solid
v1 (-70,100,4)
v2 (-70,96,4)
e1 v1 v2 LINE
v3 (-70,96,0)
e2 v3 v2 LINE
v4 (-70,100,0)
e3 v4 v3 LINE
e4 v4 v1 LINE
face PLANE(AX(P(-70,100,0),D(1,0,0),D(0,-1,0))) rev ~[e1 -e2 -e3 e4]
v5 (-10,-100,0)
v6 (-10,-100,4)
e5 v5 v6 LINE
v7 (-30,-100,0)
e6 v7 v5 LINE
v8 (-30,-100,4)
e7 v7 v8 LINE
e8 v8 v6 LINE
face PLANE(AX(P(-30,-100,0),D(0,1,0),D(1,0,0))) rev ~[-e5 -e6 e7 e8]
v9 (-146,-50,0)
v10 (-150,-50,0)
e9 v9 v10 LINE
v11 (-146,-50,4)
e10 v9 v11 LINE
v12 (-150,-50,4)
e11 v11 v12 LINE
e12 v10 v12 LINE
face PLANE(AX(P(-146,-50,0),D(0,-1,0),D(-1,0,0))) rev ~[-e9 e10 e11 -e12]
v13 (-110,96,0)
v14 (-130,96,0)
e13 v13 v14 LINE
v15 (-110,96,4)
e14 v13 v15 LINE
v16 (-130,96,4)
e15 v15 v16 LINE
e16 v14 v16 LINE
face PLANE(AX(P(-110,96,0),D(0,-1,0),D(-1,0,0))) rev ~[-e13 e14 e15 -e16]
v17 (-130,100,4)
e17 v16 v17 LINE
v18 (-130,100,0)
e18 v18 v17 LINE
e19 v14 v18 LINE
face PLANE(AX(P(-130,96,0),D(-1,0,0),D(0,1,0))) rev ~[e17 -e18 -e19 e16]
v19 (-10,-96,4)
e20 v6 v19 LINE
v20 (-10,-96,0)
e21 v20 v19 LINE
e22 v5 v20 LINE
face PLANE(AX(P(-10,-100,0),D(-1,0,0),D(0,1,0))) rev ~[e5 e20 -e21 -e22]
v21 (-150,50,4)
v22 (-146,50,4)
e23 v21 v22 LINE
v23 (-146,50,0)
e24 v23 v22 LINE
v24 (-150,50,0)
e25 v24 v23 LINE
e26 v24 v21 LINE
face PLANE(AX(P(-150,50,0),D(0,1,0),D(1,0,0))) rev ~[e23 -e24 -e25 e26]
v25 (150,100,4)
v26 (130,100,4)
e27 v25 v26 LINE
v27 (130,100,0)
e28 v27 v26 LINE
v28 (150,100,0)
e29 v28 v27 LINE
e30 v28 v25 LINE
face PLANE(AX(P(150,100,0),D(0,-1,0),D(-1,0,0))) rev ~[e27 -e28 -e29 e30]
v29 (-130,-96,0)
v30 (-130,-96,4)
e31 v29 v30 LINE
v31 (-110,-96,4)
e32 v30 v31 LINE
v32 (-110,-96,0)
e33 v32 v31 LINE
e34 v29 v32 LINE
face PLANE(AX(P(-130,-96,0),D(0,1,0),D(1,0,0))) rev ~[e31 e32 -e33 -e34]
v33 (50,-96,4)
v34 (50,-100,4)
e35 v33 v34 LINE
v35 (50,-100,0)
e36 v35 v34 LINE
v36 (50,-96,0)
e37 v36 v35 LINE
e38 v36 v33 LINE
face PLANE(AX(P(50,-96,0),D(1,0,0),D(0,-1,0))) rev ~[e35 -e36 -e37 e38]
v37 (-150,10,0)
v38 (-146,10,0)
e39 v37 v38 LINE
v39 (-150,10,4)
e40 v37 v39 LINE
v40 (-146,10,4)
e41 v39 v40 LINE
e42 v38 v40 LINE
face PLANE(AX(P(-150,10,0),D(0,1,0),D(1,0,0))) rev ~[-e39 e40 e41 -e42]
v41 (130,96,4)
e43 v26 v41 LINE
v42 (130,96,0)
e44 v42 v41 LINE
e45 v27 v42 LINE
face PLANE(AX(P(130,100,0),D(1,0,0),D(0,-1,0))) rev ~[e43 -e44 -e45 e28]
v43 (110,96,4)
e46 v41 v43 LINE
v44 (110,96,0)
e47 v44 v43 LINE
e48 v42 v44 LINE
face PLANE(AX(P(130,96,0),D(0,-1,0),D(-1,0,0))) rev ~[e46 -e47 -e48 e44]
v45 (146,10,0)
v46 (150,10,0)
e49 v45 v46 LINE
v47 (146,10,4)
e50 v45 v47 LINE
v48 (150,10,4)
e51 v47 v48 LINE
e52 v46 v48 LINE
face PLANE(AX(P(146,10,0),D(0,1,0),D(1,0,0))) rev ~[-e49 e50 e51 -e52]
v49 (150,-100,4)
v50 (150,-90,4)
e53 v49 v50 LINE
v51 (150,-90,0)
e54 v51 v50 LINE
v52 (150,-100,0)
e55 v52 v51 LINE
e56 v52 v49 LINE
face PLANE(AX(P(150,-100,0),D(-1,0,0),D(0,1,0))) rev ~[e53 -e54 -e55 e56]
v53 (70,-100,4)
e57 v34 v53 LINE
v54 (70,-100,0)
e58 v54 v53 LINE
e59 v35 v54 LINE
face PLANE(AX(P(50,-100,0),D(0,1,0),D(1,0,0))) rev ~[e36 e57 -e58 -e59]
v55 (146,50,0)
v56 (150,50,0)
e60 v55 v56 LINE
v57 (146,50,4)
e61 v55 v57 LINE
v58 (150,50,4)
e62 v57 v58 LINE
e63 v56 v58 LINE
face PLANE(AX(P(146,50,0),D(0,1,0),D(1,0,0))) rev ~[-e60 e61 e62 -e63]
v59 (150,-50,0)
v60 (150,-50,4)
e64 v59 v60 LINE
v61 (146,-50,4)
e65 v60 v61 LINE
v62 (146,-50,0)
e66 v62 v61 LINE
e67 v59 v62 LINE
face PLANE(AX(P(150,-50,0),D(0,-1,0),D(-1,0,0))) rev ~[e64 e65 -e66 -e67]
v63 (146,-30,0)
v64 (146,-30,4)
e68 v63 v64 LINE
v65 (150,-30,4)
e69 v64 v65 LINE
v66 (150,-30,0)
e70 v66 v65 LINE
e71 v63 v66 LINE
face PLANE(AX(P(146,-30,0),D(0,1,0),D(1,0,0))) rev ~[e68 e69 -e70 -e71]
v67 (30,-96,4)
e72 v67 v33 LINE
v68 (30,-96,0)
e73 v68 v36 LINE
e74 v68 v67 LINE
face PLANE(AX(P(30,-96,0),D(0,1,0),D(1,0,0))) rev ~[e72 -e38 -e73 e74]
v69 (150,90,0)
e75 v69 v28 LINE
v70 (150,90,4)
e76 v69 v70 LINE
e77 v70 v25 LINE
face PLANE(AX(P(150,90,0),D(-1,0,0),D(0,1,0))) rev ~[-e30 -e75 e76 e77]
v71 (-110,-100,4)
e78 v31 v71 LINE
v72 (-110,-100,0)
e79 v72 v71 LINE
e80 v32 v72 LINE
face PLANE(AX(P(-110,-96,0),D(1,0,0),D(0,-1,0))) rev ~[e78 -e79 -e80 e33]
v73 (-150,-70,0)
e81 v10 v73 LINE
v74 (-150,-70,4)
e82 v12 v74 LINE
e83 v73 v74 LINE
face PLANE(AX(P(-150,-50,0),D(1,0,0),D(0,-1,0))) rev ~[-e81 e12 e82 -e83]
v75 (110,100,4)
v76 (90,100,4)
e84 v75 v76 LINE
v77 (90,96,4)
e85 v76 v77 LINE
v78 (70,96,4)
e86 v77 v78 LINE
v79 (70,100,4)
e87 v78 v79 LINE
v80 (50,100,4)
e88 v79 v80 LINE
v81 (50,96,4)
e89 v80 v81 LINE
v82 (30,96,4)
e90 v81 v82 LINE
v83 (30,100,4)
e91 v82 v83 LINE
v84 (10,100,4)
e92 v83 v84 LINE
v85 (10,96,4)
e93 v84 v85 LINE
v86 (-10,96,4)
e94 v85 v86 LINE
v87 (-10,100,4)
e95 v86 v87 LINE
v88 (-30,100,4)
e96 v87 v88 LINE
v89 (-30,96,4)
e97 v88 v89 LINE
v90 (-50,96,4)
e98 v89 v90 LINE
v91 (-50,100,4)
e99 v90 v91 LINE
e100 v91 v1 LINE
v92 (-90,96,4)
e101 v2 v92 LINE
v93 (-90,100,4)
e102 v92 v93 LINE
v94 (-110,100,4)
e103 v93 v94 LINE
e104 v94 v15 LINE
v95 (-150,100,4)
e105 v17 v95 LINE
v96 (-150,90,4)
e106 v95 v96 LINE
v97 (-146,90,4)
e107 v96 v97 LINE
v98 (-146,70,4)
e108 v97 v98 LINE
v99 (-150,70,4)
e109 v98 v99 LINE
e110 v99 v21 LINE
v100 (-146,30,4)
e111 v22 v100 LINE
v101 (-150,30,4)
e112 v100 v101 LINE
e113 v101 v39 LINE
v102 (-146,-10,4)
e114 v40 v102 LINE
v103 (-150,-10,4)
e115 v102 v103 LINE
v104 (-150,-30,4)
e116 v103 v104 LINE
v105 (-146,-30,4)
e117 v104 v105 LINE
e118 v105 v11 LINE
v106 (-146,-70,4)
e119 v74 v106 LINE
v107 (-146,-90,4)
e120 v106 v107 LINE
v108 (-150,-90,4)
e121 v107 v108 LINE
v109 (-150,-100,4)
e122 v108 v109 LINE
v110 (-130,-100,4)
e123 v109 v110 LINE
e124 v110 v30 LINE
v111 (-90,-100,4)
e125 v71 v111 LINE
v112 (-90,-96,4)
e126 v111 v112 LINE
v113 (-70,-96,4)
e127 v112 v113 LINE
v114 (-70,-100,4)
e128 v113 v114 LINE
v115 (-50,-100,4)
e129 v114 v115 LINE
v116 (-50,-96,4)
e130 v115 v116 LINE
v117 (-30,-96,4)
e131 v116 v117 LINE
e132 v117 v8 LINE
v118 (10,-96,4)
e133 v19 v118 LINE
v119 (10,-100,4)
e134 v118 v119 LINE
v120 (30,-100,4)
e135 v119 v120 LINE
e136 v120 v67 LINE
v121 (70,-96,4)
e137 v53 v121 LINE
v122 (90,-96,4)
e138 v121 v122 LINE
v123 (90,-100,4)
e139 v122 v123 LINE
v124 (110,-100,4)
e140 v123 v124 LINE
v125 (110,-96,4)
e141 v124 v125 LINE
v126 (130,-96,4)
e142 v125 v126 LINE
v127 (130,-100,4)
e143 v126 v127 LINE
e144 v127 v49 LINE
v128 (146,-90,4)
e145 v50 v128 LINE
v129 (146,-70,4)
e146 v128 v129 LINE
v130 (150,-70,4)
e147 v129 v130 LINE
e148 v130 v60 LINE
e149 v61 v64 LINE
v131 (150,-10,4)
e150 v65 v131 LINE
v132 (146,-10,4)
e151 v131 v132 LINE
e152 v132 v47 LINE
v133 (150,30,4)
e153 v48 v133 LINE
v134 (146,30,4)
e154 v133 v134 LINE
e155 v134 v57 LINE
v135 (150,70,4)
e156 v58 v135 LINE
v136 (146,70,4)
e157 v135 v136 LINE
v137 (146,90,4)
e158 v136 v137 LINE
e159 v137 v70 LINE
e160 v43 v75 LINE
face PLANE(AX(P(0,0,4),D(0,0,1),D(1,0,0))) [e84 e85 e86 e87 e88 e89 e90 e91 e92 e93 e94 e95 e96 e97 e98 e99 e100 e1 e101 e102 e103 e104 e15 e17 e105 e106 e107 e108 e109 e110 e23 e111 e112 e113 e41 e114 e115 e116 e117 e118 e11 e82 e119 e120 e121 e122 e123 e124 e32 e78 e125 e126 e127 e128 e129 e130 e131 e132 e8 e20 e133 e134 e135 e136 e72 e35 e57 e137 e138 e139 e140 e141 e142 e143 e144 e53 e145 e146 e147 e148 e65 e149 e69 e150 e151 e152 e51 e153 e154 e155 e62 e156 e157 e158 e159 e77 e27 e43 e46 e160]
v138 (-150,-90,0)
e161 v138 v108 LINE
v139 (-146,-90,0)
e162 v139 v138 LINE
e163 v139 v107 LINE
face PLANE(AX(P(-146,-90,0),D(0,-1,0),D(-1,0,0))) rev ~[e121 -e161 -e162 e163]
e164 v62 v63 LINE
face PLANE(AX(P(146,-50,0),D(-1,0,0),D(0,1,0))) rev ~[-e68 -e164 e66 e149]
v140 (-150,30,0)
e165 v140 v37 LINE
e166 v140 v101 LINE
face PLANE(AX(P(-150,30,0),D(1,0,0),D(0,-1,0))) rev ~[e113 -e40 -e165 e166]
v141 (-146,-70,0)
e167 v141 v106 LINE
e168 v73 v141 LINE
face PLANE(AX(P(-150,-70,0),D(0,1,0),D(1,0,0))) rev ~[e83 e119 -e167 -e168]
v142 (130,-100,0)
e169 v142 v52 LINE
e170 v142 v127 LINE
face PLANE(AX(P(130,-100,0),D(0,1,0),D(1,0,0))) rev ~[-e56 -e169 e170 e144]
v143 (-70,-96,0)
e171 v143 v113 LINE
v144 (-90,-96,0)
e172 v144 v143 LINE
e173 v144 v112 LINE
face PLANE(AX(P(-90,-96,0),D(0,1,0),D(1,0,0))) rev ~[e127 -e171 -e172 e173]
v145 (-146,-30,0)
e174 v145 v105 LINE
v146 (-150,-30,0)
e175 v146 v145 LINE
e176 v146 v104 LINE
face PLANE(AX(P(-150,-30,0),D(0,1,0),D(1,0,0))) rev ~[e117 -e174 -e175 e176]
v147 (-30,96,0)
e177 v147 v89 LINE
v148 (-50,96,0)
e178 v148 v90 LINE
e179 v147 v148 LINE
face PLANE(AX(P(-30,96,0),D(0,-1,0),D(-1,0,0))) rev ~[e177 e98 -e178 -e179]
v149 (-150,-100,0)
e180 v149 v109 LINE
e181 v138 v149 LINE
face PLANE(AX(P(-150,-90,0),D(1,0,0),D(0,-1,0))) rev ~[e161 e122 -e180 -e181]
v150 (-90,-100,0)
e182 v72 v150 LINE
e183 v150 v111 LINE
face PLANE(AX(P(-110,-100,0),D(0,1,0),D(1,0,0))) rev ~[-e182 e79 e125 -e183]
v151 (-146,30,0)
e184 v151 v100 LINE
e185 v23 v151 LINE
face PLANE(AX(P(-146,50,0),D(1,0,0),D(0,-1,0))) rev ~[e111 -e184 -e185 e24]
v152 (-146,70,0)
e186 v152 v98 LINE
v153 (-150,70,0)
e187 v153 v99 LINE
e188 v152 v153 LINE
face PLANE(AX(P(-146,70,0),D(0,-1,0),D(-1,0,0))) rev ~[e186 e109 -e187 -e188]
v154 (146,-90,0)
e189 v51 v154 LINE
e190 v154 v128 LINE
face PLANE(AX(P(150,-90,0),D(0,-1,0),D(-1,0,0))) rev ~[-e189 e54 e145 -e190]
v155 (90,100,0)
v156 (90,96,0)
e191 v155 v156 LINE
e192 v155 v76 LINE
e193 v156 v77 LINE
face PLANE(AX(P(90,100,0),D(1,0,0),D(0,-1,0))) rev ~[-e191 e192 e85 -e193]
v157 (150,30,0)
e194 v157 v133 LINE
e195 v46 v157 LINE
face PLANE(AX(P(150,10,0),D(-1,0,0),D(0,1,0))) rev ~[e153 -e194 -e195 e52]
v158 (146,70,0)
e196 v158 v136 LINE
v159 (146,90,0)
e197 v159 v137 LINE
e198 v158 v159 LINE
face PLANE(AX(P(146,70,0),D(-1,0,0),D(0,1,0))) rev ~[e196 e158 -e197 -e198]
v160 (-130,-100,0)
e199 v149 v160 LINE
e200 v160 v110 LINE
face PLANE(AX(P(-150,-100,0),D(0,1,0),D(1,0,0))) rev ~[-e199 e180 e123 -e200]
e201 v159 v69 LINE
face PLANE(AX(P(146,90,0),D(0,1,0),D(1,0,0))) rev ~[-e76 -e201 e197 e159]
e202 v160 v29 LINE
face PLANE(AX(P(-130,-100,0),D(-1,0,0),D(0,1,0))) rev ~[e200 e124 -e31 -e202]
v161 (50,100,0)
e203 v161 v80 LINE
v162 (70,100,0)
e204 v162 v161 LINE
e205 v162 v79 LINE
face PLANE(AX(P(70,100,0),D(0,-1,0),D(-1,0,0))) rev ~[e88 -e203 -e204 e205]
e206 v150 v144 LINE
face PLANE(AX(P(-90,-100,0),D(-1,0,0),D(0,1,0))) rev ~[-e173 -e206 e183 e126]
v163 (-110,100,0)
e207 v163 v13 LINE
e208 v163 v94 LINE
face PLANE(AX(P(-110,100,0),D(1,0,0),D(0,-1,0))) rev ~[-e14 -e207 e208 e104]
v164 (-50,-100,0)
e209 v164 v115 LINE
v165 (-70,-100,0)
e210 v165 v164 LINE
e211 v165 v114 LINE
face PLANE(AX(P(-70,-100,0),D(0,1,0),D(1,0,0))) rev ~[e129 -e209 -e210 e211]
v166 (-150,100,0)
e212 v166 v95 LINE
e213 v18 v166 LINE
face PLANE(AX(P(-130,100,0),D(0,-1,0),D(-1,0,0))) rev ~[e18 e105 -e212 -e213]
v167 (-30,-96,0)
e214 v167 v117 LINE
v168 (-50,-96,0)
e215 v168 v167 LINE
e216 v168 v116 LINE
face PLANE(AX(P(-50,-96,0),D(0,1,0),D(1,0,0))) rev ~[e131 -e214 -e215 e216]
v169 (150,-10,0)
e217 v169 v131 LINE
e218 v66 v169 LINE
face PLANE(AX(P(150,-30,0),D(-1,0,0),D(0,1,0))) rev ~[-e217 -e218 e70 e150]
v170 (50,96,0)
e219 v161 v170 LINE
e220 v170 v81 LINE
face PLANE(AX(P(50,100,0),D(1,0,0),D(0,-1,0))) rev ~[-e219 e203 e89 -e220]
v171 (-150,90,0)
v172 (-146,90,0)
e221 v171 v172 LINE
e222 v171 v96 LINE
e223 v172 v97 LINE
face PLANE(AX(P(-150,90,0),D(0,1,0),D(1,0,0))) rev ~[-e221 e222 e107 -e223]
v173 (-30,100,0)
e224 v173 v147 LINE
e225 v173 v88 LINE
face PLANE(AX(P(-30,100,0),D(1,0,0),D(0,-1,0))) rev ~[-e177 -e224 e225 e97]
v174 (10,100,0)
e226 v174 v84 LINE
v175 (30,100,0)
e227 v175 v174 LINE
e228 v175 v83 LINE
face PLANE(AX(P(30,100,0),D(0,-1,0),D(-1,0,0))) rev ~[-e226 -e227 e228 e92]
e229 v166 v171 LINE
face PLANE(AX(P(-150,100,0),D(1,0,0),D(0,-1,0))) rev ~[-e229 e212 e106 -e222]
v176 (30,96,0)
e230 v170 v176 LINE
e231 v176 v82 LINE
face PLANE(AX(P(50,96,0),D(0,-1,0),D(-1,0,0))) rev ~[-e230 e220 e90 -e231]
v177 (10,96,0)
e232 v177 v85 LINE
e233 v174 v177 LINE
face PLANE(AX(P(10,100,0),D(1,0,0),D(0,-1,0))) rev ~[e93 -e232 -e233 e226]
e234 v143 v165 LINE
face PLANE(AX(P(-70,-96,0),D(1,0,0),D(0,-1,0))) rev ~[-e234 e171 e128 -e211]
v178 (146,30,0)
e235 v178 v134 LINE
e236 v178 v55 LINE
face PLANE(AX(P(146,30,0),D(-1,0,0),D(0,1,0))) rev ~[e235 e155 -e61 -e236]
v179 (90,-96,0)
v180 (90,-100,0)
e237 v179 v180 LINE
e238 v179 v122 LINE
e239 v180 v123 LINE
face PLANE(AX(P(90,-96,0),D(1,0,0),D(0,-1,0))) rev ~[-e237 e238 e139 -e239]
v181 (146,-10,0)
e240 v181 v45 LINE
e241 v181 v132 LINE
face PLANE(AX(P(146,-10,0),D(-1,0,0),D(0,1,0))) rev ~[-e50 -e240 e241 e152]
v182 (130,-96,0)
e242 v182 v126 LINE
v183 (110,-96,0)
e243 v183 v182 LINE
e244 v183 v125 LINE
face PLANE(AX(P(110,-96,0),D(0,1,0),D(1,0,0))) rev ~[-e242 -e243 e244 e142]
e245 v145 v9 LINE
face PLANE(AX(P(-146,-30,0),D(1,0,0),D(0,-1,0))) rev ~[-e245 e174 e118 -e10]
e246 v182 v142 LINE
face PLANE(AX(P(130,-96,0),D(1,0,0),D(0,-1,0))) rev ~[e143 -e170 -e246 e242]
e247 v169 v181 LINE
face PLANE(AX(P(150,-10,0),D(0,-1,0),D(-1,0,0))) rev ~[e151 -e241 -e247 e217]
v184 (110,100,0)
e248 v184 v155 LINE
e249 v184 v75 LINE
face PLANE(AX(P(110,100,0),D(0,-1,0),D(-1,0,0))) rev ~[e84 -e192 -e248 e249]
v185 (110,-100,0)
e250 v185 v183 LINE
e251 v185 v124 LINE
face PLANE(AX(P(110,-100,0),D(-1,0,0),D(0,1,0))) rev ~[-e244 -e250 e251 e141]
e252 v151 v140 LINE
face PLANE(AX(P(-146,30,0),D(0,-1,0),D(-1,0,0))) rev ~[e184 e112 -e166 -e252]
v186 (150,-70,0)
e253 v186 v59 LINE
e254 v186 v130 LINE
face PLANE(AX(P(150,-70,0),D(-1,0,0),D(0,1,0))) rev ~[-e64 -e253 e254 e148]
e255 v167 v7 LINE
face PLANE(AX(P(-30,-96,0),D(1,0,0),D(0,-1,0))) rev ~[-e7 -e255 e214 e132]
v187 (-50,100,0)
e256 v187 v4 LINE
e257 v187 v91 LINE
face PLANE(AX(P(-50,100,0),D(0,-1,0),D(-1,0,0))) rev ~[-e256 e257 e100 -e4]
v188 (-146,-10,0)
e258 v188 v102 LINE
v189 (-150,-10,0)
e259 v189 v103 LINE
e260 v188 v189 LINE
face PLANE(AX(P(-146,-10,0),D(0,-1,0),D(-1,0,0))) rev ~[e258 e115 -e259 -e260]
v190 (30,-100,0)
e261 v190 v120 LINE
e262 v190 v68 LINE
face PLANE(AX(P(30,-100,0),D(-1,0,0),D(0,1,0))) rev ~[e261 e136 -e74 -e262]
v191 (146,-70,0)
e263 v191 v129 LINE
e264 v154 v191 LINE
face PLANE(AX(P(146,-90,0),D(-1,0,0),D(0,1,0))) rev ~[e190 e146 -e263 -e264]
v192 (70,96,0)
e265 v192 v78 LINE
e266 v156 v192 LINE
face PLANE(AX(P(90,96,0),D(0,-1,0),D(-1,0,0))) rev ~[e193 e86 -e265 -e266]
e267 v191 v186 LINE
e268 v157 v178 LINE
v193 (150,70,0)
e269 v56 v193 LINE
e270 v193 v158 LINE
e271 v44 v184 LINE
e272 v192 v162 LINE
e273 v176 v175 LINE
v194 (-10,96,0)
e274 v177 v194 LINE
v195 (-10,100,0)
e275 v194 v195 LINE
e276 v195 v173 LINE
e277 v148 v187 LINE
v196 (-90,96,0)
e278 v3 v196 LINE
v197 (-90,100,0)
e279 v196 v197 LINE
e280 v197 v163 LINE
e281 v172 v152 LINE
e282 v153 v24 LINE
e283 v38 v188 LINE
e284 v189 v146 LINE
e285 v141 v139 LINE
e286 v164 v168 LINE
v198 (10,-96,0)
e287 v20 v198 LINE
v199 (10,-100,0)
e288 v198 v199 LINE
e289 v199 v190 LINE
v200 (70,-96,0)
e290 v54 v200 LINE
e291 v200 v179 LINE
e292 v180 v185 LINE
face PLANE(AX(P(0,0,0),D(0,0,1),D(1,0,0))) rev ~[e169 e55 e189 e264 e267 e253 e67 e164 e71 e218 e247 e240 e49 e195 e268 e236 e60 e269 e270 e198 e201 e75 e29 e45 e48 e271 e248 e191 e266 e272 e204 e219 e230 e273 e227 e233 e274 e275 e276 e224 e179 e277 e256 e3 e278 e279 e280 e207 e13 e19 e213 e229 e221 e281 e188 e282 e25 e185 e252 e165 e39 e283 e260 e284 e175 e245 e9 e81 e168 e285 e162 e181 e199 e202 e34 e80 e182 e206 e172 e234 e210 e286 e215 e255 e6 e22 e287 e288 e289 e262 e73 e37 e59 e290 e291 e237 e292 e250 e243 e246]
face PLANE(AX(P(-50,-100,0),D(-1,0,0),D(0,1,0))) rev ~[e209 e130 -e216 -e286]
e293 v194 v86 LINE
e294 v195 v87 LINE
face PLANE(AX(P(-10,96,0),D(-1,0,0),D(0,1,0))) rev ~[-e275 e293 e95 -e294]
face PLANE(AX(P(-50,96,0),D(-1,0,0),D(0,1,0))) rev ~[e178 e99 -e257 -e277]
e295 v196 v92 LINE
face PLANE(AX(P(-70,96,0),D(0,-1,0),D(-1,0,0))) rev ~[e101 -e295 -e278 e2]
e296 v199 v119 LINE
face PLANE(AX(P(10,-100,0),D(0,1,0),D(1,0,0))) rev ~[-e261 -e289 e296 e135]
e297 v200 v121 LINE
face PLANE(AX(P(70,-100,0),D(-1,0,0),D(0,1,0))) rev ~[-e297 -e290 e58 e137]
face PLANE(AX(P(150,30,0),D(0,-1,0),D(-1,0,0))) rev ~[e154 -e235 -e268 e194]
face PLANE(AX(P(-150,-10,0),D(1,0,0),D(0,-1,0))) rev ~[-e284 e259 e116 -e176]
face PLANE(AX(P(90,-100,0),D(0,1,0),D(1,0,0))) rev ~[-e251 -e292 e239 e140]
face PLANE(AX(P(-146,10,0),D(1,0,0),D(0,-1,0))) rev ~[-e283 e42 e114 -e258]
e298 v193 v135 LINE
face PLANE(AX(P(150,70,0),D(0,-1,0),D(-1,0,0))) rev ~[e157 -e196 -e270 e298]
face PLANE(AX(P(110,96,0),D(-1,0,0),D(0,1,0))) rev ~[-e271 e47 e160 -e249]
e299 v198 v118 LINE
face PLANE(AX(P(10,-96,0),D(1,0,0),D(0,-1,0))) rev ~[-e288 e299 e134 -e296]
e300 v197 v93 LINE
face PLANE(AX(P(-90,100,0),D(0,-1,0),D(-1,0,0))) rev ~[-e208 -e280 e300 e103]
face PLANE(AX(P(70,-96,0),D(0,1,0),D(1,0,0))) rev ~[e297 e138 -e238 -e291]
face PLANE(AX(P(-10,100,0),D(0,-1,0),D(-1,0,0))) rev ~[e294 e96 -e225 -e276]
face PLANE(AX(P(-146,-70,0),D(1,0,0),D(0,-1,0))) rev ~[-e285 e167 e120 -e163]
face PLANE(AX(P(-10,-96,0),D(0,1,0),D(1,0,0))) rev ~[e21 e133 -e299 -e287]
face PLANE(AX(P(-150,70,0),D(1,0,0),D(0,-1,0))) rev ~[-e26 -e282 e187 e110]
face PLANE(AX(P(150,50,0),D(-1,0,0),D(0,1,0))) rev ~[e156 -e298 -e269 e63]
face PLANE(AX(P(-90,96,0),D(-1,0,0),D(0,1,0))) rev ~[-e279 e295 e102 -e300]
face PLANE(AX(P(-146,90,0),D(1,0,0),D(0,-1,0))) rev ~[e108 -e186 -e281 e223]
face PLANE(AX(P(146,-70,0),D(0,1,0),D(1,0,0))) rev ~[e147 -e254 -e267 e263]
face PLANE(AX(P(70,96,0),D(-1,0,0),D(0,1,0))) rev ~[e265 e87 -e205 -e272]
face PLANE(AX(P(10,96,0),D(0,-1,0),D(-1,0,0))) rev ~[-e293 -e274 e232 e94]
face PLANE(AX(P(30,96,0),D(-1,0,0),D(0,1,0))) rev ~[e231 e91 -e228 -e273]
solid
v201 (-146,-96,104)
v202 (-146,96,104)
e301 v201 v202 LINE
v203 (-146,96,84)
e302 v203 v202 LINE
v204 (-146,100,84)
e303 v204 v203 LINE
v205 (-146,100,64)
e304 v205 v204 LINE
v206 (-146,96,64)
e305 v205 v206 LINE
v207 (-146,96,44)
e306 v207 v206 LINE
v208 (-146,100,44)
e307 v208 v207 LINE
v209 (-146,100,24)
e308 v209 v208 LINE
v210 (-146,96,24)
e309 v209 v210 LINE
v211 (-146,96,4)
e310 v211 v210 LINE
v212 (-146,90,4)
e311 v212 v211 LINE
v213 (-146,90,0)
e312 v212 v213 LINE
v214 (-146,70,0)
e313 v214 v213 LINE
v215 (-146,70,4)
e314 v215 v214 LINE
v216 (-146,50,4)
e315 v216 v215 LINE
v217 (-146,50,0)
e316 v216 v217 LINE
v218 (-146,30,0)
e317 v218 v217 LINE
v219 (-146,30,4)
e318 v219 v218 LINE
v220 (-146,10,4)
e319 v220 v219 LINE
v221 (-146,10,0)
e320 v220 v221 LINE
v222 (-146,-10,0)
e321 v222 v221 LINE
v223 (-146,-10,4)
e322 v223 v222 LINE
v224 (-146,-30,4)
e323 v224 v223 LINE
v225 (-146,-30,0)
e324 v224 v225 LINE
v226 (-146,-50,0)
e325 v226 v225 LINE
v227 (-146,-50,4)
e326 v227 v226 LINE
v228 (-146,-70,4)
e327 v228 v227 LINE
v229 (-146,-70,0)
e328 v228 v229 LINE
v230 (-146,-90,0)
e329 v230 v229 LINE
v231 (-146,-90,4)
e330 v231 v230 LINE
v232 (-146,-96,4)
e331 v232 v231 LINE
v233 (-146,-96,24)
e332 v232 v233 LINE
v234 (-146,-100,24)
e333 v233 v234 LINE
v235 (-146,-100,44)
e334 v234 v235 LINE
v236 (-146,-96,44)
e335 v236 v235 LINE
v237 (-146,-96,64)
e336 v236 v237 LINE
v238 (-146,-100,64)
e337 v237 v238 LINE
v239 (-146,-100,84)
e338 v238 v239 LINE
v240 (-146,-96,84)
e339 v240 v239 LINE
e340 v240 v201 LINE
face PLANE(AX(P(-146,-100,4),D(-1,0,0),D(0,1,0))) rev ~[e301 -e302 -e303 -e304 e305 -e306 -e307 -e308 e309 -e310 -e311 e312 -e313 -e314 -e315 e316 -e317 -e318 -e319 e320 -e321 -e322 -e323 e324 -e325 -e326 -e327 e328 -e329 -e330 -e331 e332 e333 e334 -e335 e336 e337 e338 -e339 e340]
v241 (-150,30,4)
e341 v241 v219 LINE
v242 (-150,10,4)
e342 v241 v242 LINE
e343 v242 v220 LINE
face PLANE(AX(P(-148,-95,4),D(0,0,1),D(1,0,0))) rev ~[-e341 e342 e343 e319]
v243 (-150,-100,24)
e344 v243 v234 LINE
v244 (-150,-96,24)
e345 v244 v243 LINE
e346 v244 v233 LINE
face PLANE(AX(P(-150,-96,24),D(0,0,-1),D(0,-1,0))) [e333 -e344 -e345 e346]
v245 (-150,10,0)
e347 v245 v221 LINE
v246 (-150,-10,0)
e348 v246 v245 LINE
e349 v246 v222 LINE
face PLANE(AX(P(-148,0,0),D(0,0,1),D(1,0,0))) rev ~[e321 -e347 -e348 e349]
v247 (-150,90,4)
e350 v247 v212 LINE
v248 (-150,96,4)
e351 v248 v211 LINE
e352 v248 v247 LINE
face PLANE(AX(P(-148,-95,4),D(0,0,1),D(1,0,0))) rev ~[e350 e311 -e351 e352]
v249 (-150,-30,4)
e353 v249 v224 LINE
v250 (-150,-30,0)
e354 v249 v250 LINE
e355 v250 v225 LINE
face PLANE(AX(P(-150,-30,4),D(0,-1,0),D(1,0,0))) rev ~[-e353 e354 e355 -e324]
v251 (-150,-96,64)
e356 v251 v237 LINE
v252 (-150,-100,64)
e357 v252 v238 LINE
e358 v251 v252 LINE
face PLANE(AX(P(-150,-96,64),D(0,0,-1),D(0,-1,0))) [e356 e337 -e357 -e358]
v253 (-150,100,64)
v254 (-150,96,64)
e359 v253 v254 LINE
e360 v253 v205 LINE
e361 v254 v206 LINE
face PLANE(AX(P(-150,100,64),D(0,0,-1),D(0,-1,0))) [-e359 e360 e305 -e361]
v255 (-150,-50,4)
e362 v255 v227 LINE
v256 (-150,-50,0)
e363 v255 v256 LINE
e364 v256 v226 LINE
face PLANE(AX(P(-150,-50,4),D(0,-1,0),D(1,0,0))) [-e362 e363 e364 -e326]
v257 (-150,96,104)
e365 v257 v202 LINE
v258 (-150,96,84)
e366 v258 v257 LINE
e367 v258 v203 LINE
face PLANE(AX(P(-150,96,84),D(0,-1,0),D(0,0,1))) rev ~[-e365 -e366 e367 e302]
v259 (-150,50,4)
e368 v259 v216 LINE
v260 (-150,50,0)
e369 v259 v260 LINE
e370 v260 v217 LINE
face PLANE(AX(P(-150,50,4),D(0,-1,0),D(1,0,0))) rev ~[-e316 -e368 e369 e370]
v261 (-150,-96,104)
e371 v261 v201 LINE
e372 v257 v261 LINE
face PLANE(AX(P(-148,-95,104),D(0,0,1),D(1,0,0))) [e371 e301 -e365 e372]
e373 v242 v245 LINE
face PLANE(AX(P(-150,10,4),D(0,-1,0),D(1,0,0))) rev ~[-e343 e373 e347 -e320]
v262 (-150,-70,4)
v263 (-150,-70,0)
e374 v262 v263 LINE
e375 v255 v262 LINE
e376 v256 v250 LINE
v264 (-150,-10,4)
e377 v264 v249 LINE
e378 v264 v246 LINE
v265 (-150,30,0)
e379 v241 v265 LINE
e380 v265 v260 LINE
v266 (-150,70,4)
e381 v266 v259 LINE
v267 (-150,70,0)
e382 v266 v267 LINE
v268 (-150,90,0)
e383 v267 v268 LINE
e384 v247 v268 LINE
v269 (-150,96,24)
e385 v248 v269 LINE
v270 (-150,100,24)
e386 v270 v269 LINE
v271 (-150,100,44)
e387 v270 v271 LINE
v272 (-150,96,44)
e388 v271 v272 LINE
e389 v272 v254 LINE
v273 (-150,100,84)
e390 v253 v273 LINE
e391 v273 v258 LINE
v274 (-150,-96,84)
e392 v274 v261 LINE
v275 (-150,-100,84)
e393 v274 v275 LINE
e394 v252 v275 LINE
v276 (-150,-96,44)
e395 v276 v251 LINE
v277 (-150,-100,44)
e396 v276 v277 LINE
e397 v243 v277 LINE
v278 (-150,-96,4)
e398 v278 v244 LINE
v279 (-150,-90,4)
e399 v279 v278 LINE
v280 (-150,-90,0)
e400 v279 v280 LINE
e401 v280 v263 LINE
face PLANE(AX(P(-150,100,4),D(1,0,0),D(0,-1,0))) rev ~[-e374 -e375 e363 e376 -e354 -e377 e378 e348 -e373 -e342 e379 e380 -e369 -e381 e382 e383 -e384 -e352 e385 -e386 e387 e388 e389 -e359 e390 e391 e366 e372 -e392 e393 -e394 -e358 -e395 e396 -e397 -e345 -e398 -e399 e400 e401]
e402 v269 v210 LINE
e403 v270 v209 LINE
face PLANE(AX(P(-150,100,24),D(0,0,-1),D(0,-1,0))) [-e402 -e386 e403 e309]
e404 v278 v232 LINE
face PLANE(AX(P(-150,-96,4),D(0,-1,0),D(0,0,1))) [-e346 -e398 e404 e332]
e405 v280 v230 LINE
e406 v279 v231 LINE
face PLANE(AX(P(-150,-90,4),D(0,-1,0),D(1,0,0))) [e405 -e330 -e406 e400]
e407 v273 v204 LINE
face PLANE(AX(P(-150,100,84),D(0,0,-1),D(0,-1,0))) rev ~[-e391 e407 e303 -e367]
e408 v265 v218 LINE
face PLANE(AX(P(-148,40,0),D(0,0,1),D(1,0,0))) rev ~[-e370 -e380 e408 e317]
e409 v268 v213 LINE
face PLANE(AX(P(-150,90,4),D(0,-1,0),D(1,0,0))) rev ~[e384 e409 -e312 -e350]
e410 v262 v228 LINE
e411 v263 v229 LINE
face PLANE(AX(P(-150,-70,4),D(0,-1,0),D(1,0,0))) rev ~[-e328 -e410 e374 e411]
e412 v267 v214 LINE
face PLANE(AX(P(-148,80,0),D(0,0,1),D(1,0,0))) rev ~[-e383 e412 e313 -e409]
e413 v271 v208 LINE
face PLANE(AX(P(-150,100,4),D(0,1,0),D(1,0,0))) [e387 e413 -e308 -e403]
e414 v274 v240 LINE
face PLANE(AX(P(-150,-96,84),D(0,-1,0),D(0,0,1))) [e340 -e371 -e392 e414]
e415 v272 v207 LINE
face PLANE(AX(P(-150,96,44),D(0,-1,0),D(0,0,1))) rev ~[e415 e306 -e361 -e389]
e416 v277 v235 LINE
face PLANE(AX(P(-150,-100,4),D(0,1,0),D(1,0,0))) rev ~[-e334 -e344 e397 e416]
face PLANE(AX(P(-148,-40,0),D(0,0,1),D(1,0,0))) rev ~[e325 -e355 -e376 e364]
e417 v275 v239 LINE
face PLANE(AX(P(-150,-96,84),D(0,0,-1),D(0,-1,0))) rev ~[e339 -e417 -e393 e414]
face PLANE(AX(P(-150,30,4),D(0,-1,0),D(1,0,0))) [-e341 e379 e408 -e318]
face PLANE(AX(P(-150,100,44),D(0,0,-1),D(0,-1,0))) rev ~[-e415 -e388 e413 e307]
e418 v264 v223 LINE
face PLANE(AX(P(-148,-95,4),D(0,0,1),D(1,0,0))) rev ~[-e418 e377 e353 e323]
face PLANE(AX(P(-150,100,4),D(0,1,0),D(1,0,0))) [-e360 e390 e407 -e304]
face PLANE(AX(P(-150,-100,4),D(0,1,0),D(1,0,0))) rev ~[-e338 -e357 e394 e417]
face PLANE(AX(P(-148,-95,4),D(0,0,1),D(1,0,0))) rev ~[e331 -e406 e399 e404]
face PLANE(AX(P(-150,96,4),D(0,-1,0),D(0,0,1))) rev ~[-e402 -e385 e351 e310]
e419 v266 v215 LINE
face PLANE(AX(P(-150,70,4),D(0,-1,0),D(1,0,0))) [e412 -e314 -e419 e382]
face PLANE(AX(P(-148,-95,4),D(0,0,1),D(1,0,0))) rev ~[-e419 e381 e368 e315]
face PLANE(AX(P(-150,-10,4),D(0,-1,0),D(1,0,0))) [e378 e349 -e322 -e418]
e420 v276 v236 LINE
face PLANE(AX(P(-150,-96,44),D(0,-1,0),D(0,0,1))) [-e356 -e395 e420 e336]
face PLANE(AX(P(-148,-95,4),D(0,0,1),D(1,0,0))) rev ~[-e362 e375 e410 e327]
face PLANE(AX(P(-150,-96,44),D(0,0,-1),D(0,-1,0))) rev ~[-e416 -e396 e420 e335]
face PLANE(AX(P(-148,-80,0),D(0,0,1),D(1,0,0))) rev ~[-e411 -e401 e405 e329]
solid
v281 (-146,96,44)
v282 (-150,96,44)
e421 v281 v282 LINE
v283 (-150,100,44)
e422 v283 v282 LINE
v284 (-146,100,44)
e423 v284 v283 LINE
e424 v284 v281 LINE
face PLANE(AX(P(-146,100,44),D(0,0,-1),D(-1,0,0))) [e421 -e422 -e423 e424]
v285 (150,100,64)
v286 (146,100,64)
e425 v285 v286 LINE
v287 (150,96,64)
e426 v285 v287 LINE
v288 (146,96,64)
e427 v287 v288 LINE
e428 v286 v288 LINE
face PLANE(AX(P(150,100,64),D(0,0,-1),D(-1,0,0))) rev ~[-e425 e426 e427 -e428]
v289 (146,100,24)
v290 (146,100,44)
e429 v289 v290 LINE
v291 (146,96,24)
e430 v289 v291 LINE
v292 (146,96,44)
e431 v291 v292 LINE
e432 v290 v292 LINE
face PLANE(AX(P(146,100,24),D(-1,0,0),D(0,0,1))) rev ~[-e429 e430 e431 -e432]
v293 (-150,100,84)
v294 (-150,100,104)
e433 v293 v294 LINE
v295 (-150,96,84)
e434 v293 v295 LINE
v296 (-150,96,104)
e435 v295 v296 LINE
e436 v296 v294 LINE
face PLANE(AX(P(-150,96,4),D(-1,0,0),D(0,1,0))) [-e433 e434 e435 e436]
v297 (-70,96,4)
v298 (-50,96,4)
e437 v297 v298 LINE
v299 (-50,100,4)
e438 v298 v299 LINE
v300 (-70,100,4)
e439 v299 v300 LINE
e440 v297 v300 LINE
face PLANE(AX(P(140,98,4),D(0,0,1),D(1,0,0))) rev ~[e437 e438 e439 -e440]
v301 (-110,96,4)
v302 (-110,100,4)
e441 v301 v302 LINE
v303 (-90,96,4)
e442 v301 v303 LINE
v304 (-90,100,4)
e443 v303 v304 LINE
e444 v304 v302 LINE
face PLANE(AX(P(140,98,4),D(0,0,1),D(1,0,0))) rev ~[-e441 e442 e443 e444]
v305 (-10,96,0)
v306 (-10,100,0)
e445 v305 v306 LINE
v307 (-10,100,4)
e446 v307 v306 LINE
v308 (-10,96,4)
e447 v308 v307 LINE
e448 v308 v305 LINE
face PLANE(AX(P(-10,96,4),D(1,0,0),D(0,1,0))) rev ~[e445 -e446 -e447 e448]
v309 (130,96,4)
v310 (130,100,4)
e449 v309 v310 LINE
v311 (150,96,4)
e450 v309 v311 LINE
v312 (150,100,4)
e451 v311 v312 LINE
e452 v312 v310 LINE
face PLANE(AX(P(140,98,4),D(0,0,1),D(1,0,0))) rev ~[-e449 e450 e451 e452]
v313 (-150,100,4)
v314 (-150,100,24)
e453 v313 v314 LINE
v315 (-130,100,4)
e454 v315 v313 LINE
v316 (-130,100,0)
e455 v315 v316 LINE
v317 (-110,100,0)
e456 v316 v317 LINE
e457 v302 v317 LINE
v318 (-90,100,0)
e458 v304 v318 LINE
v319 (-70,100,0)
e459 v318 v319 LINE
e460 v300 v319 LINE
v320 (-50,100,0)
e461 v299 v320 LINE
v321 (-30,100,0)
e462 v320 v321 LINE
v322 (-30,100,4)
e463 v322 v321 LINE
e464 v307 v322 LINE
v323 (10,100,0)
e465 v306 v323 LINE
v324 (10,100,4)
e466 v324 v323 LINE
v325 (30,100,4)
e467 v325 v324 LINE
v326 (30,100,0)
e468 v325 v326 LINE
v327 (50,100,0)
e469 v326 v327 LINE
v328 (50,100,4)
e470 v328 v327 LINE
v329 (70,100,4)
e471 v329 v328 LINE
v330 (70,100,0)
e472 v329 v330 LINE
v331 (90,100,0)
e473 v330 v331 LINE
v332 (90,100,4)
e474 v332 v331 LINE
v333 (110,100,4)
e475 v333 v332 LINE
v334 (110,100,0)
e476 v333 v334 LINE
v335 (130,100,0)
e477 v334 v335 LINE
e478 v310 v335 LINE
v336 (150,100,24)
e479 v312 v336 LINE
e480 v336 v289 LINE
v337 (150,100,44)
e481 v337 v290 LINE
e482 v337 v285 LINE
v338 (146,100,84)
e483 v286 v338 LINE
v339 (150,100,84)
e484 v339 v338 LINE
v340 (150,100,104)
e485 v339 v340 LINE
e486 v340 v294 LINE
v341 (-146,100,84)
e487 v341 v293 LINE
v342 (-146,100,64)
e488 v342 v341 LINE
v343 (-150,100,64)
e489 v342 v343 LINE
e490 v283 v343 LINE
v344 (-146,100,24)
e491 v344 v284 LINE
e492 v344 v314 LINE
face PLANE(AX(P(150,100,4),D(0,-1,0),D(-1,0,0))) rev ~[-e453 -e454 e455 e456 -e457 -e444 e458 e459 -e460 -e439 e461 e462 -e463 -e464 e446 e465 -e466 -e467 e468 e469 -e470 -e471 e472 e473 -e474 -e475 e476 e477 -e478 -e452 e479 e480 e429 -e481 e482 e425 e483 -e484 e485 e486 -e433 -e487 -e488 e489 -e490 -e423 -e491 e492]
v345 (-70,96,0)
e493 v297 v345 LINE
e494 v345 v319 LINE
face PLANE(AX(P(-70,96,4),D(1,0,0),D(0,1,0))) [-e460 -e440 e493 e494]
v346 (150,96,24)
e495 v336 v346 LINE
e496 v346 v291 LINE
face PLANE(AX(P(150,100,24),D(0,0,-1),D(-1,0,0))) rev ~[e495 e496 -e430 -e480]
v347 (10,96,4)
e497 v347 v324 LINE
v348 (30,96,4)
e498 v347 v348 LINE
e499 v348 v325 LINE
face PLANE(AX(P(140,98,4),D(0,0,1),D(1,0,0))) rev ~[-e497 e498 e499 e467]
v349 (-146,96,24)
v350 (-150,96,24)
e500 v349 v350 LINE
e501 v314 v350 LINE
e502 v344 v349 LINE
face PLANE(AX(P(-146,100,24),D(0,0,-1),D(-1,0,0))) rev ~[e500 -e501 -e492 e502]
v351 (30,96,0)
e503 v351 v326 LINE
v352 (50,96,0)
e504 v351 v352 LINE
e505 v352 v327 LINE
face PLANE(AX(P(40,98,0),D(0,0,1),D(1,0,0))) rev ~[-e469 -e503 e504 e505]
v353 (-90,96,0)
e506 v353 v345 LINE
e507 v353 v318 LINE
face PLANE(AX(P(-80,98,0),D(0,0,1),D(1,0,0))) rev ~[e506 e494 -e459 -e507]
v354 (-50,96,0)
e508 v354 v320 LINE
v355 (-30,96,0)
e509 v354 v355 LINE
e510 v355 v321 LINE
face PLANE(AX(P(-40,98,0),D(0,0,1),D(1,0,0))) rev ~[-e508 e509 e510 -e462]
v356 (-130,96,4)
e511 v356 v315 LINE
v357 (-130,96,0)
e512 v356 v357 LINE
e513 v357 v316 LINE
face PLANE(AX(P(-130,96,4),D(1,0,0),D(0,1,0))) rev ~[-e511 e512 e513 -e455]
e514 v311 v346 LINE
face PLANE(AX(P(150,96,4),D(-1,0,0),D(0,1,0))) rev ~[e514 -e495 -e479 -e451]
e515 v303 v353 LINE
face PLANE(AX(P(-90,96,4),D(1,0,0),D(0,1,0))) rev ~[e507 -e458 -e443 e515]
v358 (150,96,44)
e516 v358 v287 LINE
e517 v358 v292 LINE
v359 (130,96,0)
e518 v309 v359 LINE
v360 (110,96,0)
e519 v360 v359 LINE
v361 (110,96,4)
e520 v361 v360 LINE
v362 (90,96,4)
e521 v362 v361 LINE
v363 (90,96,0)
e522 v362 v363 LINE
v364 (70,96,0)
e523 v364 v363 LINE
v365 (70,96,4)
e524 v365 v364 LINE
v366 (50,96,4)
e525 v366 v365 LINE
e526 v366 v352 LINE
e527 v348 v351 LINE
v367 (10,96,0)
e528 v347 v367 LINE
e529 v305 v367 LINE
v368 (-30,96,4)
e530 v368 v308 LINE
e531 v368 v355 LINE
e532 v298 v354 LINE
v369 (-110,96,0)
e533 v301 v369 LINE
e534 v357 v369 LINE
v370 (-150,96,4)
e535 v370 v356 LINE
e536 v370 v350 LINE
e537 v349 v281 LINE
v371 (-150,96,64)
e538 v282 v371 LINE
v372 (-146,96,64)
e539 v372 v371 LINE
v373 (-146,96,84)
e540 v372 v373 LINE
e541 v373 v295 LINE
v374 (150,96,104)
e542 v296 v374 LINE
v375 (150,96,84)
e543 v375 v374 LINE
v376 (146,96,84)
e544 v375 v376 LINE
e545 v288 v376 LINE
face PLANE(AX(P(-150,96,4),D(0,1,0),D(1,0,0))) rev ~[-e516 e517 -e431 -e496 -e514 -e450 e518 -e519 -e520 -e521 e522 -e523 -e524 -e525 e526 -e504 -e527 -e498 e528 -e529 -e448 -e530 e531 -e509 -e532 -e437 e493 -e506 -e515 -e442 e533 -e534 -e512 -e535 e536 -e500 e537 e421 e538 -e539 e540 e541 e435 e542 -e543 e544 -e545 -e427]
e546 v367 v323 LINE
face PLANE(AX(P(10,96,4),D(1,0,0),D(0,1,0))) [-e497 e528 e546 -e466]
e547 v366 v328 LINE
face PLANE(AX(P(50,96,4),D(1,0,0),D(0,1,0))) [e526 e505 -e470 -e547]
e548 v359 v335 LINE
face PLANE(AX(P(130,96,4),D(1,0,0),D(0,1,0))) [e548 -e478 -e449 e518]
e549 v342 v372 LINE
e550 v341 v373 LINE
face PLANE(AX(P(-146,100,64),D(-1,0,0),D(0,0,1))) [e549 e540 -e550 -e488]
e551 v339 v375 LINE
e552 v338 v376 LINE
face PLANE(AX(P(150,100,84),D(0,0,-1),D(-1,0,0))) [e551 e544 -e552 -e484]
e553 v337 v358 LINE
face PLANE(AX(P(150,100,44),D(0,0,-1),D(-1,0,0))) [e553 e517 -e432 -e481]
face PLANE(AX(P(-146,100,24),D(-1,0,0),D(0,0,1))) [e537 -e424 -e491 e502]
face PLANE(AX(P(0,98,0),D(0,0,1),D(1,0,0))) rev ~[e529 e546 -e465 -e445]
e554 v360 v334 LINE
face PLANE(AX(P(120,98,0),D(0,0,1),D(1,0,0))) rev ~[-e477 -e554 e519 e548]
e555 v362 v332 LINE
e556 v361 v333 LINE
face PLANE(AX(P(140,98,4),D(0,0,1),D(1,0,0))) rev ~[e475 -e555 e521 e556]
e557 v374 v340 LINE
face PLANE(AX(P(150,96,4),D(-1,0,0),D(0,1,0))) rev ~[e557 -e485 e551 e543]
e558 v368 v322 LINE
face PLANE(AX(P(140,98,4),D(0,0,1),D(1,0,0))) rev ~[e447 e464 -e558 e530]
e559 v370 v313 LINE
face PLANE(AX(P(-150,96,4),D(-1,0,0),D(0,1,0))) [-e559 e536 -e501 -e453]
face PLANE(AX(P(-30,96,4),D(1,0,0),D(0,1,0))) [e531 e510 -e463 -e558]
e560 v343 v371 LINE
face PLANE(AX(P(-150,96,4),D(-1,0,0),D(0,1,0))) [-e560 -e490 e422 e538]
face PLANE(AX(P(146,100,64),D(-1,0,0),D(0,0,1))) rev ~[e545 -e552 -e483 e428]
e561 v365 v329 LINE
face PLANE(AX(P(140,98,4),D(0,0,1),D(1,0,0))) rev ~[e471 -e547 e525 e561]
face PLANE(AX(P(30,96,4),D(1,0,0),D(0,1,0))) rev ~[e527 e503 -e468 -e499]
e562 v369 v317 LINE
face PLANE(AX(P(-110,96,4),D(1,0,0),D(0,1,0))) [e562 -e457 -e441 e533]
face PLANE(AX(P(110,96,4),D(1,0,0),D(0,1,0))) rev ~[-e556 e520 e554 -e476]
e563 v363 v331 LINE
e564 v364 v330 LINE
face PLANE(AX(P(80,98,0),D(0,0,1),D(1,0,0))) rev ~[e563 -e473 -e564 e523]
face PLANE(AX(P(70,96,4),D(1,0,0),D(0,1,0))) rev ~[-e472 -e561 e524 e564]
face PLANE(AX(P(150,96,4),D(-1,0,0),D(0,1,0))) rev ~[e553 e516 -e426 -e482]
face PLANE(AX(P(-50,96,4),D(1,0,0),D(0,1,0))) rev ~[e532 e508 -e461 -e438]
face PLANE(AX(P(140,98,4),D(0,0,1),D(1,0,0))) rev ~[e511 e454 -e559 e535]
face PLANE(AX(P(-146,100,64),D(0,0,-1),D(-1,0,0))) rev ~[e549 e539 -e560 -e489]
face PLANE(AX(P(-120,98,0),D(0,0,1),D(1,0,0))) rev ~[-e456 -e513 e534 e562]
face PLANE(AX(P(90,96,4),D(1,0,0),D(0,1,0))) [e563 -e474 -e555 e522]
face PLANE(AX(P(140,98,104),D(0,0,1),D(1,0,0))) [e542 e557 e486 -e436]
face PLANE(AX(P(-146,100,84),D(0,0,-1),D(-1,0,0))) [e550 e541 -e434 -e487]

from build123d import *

# Parameters (mm, degrees)
F1_DEPTH  = 4
F2_W      = 20
F2_H      = 4
F3_DEPTH  = 4
F4_W      = 20
F4_H      = 4
F5_DEPTH  = 100
F7_W      = 4
F7_H      = 20
F8_DEPTH  = 4
F9_W      = 4
F9_H      = 10
F9_H_2    = 20
F10_DEPTH = 100
F12_W     = 4
F12_H     = 20
F13_DEPTH = 4
F14_W     = 4
F14_H     = 20
F15_DEPTH = 4


with BuildPart() as f1:
    # F0 (on Top) → F1 (new body)
    with BuildSketch(Plane.XY):
        Polygon((150, 90), (150, 100), (130, 100), (130, 96), (120, 96), (110, 96), (110, 100), (90, 100), (90, 96), (80, 96), (70, 96), (70, 100), (50, 100), (50, 96), (40, 96), (30, 96), (30, 100), (10, 100), (10, 96), (0, 96), (-10, 96), (-10, 100), (-30, 100), (-30, 96), (-40, 96), (-50, 96), (-50, 100), (-70, 100), (-70, 96), (-80, 96), (-90, 96), (-90, 100), (-110, 100), (-110, 96), (-120, 96), (-130, 96), (-130, 100), (-150, 100), (-150, 90), (-146, 90), (-146, 80), (-146, 70), (-150, 70), (-150, 50), (-146, 50), (-146, 40), (-146, 30), (-150, 30), (-150, 10), (-146, 10), (-146, 0), (-146, -10), (-150, -10), (-150, -30), (-146, -30), (-146, -40), (-146, -50), (-150, -50), (-150, -70), (-146, -70), (-146, -80), (-146, -90), (-150, -90), (-150, -100), (-130, -100), (-130, -96), (-120, -96), (-110, -96), (-110, -100), (-90, -100), (-90, -96), (-80, -96), (-70, -96), (-70, -100), (-50, -100), (-50, -96), (-40, -96), (-30, -96), (-30, -100), (-10, -100), (-10, -96), (0, -96), (10, -96), (10, -100), (30, -100), (30, -96), (40, -96), (50, -96), (50, -100), (70, -100), (70, -96), (80, -96), (90, -96), (90, -100), (110, -100), (110, -96), (120, -96), (130, -96), (130, -100), (150, -100), (150, -90), (146, -90), (146, -80), (146, -70), (150, -70), (150, -50), (146, -50), (146, -40), (146, -30), (150, -30), (150, -10), (146, -10), (146, 0), (146, 10), (150, 10), (150, 30), (146, 30), (146, 40), (146, 50), (150, 50), (150, 70), (146, 70), (146, 80), (146, 90), align=None)
    extrude(amount=F1_DEPTH)


with BuildPart() as f3:
    # F2 (on face) → F3 (new body, through all)
    with BuildSketch(Plane.XY.offset(4)):
        with Locations((-120, 98)):
            Rectangle(F2_W, F2_H)
    extrude(amount=-F3_DEPTH)



with BuildPart() as f3b:
    # F2 (on face) → F3, piece 2 (new body, through all)
    with BuildSketch(Plane.XY.offset(4)):
        with Locations((120, 98)):
            Rectangle(F2_W, F2_H)
    extrude(amount=-F3_DEPTH)


with BuildPart() as f3c:
    # F2 (on face) → F3, piece 3 (new body, through all)
    with BuildSketch(Plane.XY.offset(4)):
        with Locations((80, 98)):
            Rectangle(F2_W, F2_H)
    extrude(amount=-F3_DEPTH)


with BuildPart() as f3d:
    # F2 (on face) → F3, piece 4 (new body, through all)
    with BuildSketch(Plane.XY.offset(4)):
        with Locations((40, 98)):
            Rectangle(F2_W, F2_H)
    extrude(amount=-F3_DEPTH)


with BuildPart() as f3e:
    # F2 (on face) → F3, piece 5 (new body, through all)
    with BuildSketch(Plane.XY.offset(4)):
        with Locations((0, 98)):
            Rectangle(F2_W, F2_H)
    extrude(amount=-F3_DEPTH)


with BuildPart() as f3f:
    # F2 (on face) → F3, piece 6 (new body, through all)
    with BuildSketch(Plane.XY.offset(4)):
        with Locations((-40, 98)):
            Rectangle(F2_W, F2_H)
    extrude(amount=-F3_DEPTH)


with BuildPart() as f3g:
    # F2 (on face) → F3, piece 7 (new body, through all)
    with BuildSketch(Plane.XY.offset(4)):
        with Locations((-80, 98)):
            Rectangle(F2_W, F2_H)
    extrude(amount=-F3_DEPTH)


with BuildPart() as f3_1:
    add(f3.part)

    add(f3b.part)  # F5 merges F3b

    add(f3c.part)  # F5 merges F3c

    add(f3d.part)  # F5 merges F3d

    add(f3e.part)  # F5 merges F3e

    add(f3f.part)  # F5 merges F3f

    add(f3g.part)  # F5 merges F3g
    # F4 (on face) → F5 (join)
    with BuildSketch(Plane.XY.offset(4)):
        with Locations((140, 98)):
            Rectangle(F4_W, F4_H)
        with Locations((120, 98)):
            Rectangle(F4_W, F4_H)
        with Locations((100, 98)):
            Rectangle(F4_W, F4_H)
        with Locations((80, 98)):
            Rectangle(F4_W, F4_H)
        with Locations((60, 98)):
            Rectangle(F4_W, F4_H)
        with Locations((40, 98)):
            Rectangle(F4_W, F4_H)
        with Locations((20, 98)):
            Rectangle(F4_W, F4_H)
        with Locations((0, 98)):
            Rectangle(F4_W, F4_H)
        with Locations((-20, 98)):
            Rectangle(F4_W, F4_H)
        with Locations((-40, 98)):
            Rectangle(F4_W, F4_H)
        with Locations((-60, 98)):
            Rectangle(F4_W, F4_H)
        with Locations((-80, 98)):
            Rectangle(F4_W, F4_H)
        with Locations((-100, 98)):
            Rectangle(F4_W, F4_H)
        with Locations((-120, 98)):
            Rectangle(F4_W, F4_H)
        with Locations((-140, 98)):
            Rectangle(F4_W, F4_H)
    extrude(amount=F5_DEPTH)

    # F6: union 

    # F14 (on face) → F15 (cut, through all)
    with BuildSketch(Plane(origin=(0, 100, 0), x_dir=(-1, 0, 0), z_dir=(0, 1, 0))):
        with Locations((-148, 74)):
            Rectangle(F14_W, F14_H)
        with Locations((-148, 34)):
            Rectangle(F14_W, F14_H)
        with Locations((148, 74)):
            Rectangle(F14_W, F14_H)
        with Locations((148, 34)):
            Rectangle(F14_W, F14_H)
    extrude(amount=-F15_DEPTH, mode=Mode.SUBTRACT)


with BuildPart() as f8:
    # F7 (on face) → F8 (new body, through all)
    with BuildSketch(Plane.XY.offset(4)):
        with Locations((-148, 80)):
            Rectangle(F7_W, F7_H)
    extrude(amount=-F8_DEPTH)



with BuildPart() as f8b:
    # F7 (on face) → F8, piece 2 (new body, through all)
    with BuildSketch(Plane.XY.offset(4)):
        with Locations((-148, 40)):
            Rectangle(F7_W, F7_H)
    extrude(amount=-F8_DEPTH)


with BuildPart() as f8c:
    # F7 (on face) → F8, piece 3 (new body, through all)
    with BuildSketch(Plane.XY.offset(4)):
        with Locations((-148, 0)):
            Rectangle(F7_W, F7_H)
    extrude(amount=-F8_DEPTH)


with BuildPart() as f8d:
    # F7 (on face) → F8, piece 4 (new body, through all)
    with BuildSketch(Plane.XY.offset(4)):
        with Locations((-148, -40)):
            Rectangle(F7_W, F7_H)
    extrude(amount=-F8_DEPTH)


with BuildPart() as f8e:
    # F7 (on face) → F8, piece 5 (new body, through all)
    with BuildSketch(Plane.XY.offset(4)):
        with Locations((-148, -80)):
            Rectangle(F7_W, F7_H)
    extrude(amount=-F8_DEPTH)


with BuildPart() as f8_1:
    add(f8.part)

    add(f8b.part)  # F10 merges F8b

    add(f8c.part)  # F10 merges F8c

    add(f8d.part)  # F10 merges F8d

    add(f8e.part)  # F10 merges F8e
    # F9 (on face) → F10 (join)
    with BuildSketch(Plane.XY.offset(4)):
        with Locations((-148, -95)):
            Rectangle(F9_W, F9_H)
        with Locations((-148, -80)):
            Rectangle(F9_W, F9_H_2)
        with Locations((-148, -60)):
            Rectangle(F9_W, F9_H_2)
        with Locations((-148, -40)):
            Rectangle(F9_W, F9_H_2)
        with Locations((-148, -20)):
            Rectangle(F9_W, F9_H_2)
        with Locations((-148, 0)):
            Rectangle(F9_W, F9_H_2)
        with Locations((-148, 20)):
            Rectangle(F9_W, F9_H_2)
        with Locations((-148, 40)):
            Rectangle(F9_W, F9_H_2)
        with Locations((-148, 60)):
            Rectangle(F9_W, F9_H_2)
        with Locations((-148, 80)):
            Rectangle(F9_W, F9_H_2)
        with Locations((-148, 95)):
            Rectangle(F9_W, F9_H)
    extrude(amount=F10_DEPTH)

    # F11: union 

    # F12 (on face) → F13 (cut, through all)
    with BuildSketch(Plane(origin=(-150, 0, 0), x_dir=(0, -1, 0), z_dir=(-1, 0, 0))):
        with Locations((-98, 14)):
            Rectangle(F12_W, F12_H)
        with Locations((-98, 54)):
            Rectangle(F12_W, F12_H)
        with Locations((-98, 94)):
            Rectangle(F12_W, F12_H)
        with Locations((98, 14)):
            Rectangle(F12_W, F12_H)
        with Locations((98, 54)):
            Rectangle(F12_W, F12_H)
        with Locations((98, 94)):
            Rectangle(F12_W, F12_H)
    extrude(amount=-F13_DEPTH, mode=Mode.SUBTRACT)


solid = Compound([f1.part, f3_1.part, f8_1.part])
